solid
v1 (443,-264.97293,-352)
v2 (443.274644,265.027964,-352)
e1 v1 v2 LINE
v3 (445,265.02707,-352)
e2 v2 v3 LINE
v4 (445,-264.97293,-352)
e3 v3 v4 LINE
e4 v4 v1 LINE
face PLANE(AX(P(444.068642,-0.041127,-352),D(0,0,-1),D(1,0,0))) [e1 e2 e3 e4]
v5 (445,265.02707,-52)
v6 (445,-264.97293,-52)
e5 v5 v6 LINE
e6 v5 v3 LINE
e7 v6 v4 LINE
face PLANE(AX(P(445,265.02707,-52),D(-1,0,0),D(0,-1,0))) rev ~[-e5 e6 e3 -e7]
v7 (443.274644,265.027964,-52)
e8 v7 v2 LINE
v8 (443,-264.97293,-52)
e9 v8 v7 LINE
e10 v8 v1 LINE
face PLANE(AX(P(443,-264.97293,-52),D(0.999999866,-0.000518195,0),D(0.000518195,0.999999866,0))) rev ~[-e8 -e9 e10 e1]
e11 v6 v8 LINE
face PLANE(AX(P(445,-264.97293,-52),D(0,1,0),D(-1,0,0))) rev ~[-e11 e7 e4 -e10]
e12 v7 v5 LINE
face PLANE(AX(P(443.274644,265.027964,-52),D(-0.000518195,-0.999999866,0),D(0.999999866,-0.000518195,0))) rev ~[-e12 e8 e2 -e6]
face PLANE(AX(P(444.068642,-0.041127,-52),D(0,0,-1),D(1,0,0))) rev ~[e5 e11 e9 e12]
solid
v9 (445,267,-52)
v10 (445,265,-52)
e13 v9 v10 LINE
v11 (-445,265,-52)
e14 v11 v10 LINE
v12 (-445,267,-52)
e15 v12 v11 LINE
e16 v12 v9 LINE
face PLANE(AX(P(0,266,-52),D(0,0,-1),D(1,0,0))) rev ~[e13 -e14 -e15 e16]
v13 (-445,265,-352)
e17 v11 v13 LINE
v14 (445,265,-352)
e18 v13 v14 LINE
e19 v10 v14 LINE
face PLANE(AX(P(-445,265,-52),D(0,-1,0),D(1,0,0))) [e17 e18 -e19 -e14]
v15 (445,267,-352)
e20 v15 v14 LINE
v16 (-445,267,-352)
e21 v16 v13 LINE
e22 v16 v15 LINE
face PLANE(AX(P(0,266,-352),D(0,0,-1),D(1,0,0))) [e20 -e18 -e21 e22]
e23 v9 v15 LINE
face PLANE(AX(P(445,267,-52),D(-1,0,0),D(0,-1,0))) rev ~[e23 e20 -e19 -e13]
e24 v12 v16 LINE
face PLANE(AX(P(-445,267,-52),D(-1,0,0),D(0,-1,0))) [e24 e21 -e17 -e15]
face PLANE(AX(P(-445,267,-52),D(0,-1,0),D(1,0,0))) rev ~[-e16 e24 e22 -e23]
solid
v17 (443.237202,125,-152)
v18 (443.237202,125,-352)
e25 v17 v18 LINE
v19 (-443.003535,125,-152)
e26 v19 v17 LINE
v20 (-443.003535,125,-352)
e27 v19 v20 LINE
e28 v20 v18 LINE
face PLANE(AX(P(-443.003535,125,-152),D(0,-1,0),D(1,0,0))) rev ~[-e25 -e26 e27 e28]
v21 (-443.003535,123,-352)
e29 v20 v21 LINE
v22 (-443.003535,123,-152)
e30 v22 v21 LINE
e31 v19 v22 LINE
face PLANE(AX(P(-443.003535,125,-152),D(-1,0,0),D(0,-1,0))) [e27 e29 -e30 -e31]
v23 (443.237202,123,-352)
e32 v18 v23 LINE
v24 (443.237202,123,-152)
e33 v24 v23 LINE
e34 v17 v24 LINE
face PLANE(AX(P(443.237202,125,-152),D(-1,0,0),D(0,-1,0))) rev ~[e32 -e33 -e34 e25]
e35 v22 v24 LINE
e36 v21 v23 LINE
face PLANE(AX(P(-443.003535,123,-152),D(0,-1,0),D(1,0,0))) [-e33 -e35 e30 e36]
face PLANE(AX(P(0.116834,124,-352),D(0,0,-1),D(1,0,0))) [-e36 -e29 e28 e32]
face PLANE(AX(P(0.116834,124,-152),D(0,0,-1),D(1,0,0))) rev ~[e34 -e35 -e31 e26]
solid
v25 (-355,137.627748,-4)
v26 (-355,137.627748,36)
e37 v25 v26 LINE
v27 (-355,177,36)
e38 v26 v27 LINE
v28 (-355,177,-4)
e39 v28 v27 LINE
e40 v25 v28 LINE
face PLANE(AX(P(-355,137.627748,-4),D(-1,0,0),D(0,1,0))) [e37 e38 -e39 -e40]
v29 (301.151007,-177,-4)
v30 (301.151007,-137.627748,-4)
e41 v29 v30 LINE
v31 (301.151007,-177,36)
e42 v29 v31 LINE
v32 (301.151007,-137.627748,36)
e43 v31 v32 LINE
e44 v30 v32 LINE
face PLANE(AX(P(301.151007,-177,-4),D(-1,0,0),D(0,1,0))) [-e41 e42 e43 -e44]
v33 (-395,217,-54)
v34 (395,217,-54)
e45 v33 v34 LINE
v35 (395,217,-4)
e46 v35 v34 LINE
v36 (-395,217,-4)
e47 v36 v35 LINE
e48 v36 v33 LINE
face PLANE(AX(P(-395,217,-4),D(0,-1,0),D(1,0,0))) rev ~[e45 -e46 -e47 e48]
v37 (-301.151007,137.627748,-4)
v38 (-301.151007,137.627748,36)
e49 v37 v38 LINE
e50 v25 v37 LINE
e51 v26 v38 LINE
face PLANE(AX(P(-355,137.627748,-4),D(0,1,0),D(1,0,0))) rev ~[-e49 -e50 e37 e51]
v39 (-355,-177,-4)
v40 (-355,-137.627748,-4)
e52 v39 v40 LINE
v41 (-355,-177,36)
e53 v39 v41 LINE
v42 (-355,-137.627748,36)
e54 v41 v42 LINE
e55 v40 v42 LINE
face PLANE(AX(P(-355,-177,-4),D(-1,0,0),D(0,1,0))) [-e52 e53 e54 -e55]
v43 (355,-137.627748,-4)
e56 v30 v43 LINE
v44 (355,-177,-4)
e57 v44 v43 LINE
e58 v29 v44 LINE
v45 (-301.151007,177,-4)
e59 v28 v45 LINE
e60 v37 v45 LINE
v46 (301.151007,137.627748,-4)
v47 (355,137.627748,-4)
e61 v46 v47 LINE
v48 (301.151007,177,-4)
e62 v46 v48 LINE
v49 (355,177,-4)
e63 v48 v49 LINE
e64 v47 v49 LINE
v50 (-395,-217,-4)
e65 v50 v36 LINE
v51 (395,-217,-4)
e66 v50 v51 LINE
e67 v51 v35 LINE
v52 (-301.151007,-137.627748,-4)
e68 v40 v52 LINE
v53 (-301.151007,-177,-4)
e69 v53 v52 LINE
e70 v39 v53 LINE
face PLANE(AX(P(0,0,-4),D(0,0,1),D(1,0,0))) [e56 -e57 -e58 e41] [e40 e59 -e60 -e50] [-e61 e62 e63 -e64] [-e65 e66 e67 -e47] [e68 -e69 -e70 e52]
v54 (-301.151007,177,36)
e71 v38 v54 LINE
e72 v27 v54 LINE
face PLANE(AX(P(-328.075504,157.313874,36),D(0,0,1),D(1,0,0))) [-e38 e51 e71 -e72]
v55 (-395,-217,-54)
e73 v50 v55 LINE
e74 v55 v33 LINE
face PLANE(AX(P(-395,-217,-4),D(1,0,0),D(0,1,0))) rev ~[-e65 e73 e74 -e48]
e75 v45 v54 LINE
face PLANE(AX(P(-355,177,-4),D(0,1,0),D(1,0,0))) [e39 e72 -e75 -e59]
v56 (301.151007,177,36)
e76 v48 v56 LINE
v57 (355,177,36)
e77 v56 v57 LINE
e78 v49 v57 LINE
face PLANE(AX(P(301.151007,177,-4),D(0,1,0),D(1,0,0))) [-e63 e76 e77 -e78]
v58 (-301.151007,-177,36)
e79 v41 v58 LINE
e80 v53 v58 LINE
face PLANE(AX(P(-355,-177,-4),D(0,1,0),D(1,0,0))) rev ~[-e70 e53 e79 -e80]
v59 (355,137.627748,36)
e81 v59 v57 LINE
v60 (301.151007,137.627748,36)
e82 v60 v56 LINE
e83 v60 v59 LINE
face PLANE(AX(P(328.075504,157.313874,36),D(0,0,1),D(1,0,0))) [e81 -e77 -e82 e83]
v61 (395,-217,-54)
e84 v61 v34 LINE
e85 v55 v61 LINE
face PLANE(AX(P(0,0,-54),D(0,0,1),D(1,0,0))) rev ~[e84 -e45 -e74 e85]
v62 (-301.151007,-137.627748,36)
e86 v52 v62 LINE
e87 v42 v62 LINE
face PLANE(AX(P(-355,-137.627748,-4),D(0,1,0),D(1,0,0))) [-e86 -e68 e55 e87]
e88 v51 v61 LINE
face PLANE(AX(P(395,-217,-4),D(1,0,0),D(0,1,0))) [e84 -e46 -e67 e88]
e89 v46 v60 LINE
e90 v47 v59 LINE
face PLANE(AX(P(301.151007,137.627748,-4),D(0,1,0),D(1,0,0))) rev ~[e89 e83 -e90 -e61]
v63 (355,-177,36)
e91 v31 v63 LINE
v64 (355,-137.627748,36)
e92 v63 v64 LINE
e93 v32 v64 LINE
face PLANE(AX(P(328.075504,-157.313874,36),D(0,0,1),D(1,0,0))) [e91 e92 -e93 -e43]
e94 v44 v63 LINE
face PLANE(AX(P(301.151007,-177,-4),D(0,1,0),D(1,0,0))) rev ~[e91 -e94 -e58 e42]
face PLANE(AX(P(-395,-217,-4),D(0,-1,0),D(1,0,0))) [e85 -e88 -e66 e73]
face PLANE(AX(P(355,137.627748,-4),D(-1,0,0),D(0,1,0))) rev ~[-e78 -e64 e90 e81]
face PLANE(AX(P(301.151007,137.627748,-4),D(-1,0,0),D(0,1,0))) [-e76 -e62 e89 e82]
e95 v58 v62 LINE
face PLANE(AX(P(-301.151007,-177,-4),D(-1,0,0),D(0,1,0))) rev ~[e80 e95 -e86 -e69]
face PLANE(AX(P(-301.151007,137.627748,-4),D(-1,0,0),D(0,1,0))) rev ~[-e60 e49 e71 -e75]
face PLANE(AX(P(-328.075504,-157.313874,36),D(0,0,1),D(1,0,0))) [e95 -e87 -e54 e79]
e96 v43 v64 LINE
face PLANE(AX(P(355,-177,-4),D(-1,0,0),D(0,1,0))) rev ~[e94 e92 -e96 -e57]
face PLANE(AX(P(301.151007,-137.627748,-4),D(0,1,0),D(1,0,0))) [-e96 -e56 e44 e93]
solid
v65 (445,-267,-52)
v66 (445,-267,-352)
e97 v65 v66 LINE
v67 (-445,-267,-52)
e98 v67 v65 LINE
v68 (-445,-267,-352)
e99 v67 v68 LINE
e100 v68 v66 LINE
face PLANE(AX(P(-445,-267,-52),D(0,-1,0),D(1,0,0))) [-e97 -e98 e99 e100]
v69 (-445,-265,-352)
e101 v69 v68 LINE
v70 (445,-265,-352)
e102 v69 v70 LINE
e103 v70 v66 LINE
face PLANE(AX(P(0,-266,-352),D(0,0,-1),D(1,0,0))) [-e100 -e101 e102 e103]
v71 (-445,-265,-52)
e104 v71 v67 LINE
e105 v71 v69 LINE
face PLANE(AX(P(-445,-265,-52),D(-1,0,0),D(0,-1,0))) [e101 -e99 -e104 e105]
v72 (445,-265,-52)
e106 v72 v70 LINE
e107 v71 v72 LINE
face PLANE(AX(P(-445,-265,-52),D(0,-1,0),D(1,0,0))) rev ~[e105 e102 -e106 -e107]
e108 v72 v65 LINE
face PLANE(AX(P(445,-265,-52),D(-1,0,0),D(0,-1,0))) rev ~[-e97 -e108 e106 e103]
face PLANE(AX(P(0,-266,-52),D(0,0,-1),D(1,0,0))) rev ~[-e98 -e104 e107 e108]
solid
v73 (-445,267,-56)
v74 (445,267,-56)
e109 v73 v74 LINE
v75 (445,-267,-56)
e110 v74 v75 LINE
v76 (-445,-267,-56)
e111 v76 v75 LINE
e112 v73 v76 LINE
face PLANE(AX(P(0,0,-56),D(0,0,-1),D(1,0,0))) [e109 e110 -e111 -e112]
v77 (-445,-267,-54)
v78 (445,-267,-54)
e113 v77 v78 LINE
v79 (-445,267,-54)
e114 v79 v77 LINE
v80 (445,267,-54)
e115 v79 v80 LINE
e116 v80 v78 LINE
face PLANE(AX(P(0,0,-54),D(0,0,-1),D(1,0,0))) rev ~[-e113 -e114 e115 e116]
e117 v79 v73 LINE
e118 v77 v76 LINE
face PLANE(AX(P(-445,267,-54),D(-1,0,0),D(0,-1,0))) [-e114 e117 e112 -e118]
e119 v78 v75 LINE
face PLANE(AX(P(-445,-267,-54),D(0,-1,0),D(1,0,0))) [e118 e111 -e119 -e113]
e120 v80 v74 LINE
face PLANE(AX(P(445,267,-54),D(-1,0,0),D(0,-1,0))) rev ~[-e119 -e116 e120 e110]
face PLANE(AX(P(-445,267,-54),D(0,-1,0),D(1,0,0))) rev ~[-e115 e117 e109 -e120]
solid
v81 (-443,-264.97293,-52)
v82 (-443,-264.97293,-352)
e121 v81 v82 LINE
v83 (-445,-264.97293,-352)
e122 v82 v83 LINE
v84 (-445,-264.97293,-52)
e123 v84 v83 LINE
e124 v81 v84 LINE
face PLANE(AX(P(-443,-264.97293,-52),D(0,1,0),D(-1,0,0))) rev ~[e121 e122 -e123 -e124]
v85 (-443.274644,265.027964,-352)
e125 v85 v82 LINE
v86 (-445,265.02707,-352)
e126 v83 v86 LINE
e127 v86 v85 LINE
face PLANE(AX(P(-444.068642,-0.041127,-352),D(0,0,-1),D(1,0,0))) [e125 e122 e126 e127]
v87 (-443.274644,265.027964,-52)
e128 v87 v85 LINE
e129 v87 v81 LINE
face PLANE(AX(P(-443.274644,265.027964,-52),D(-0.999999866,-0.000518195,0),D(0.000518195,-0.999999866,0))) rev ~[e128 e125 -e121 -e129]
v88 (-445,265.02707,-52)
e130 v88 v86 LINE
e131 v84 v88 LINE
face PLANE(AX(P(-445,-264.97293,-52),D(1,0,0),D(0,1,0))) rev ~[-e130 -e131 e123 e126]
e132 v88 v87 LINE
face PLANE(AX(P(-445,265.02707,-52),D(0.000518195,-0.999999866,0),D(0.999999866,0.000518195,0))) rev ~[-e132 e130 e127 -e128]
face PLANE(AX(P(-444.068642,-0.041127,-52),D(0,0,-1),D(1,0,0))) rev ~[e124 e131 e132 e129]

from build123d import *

# Parameters (mm, degrees)
F0_W      = 790
F0_H      = 434
F1_DEPTH  = 50
F2_W      = 890
F2_H      = 534
F3_DEPTH  = 2
F4_W      = 890
F4_H      = 2
F5_DEPTH  = 300
F6_W      = 890
F6_H      = 2
F7_DEPTH  = 300
F9_DEPTH  = 300
F10_W     = 886.24073763
F10_H     = 2
F11_DEPTH = 200
F14_W     = 53.8489925209
F14_H     = 39.3722521436
F15_DEPTH = 40


# Not quite as in the source:
# - the program builds the solid bodies; features that only make, move or delete a surface that nothing else refers to are left out


with BuildPart() as f1:
    # F0 (on Top) → F1 (new body)
    with BuildSketch(Plane.XY):
        Rectangle(F0_W, F0_H)
    extrude(amount=-F1_DEPTH)


with BuildPart() as f3:
    # F2 (on face) → F3 (new body)
    with BuildSketch(Plane(origin=(0, 0, -50), x_dir=(1, 0, 0), z_dir=(0, 0, -1))):
        Rectangle(F2_W, F2_H)
    extrude(amount=F3_DEPTH)


with BuildPart() as f5:
    # F4 (on face) → F5 (new body)
    with BuildSketch(Plane(origin=(0, 0, -52), x_dir=(1, 0, 0), z_dir=(0, 0, -1))):
        with Locations((0, 266)):
            Rectangle(F4_W, F4_H)
    extrude(amount=F5_DEPTH)


with BuildPart() as f7:
    # F6 (on face) → F7 (new body)
    with BuildSketch(Plane(origin=(0, 0, -52), x_dir=(1, 0, 0), z_dir=(0, 0, -1))):
        with Locations((0, -266)):
            Rectangle(F6_W, F6_H)
    extrude(amount=F7_DEPTH)


with BuildPart() as f9:
    # F8 (on face) → F9 (new body)
    with BuildSketch(Plane(origin=(0, 0, -52), x_dir=(1, 0, 0), z_dir=(0, 0, -1))):
        Polygon((-443, 264.9729303838), (-445, 264.9729303838), (-445, -265.0270696162), (-443.2746438212, -265.0279636871), align=None)
    extrude(amount=F9_DEPTH)


with BuildPart() as f9b:
    # F8 (on face) → F9, piece 2 (new body)
    with BuildSketch(Plane(origin=(0, 0, -52), x_dir=(1, 0, 0), z_dir=(0, 0, -1))):
        Polygon((445, -265.0270696162), (445, 264.9729303838), (443, 264.9729303838), (443.2746438214, -265.0279636871), align=None)
    extrude(amount=F9_DEPTH)


with BuildPart() as f11:
    # F10 (on face) → F11 (new body)
    with BuildSketch(Plane(origin=(0, 0, -52), x_dir=(1, 0, 0), z_dir=(0, 0, -1))):
        with Locations((0.1168335443, -124)):
            Rectangle(F10_W, F10_H)
    extrude(amount=F11_DEPTH)


with BuildPart() as f11_1:
    # F12: moved
    add(f11.part.moved(Location((0, 0, -96))))


with BuildPart() as f11_2:
    # F13: moved
    add(f11_1.part.moved(Location((0, 0, -4))))


with BuildPart() as f3_1:
    # F13: moved
    add(f3.part.moved(Location((0, 0, -4))))


with BuildPart() as f1_1:
    # F13: moved
    add(f1.part.moved(Location((0, 0, -4))))

    # F14 (on face) → F15 (join)
    with BuildSketch(Plane.XY.offset(-4)):
        with Locations((328.0755037396, 157.3138739282)):
            Rectangle(F14_W, F14_H)
        with Locations((-328.0755037396, -157.3138739282)):
            Rectangle(F14_W, F14_H)
        with Locations((328.0755037396, -157.3138739282)):
            Rectangle(F14_W, F14_H)
        with Locations((-328.0755037396, 157.3138739282)):
            Rectangle(F14_W, F14_H)
    extrude(amount=F15_DEPTH)


solid = Compound([f5.part, f7.part, f9.part, f9b.part, f11_2.part, f3_1.part, f1_1.part])
